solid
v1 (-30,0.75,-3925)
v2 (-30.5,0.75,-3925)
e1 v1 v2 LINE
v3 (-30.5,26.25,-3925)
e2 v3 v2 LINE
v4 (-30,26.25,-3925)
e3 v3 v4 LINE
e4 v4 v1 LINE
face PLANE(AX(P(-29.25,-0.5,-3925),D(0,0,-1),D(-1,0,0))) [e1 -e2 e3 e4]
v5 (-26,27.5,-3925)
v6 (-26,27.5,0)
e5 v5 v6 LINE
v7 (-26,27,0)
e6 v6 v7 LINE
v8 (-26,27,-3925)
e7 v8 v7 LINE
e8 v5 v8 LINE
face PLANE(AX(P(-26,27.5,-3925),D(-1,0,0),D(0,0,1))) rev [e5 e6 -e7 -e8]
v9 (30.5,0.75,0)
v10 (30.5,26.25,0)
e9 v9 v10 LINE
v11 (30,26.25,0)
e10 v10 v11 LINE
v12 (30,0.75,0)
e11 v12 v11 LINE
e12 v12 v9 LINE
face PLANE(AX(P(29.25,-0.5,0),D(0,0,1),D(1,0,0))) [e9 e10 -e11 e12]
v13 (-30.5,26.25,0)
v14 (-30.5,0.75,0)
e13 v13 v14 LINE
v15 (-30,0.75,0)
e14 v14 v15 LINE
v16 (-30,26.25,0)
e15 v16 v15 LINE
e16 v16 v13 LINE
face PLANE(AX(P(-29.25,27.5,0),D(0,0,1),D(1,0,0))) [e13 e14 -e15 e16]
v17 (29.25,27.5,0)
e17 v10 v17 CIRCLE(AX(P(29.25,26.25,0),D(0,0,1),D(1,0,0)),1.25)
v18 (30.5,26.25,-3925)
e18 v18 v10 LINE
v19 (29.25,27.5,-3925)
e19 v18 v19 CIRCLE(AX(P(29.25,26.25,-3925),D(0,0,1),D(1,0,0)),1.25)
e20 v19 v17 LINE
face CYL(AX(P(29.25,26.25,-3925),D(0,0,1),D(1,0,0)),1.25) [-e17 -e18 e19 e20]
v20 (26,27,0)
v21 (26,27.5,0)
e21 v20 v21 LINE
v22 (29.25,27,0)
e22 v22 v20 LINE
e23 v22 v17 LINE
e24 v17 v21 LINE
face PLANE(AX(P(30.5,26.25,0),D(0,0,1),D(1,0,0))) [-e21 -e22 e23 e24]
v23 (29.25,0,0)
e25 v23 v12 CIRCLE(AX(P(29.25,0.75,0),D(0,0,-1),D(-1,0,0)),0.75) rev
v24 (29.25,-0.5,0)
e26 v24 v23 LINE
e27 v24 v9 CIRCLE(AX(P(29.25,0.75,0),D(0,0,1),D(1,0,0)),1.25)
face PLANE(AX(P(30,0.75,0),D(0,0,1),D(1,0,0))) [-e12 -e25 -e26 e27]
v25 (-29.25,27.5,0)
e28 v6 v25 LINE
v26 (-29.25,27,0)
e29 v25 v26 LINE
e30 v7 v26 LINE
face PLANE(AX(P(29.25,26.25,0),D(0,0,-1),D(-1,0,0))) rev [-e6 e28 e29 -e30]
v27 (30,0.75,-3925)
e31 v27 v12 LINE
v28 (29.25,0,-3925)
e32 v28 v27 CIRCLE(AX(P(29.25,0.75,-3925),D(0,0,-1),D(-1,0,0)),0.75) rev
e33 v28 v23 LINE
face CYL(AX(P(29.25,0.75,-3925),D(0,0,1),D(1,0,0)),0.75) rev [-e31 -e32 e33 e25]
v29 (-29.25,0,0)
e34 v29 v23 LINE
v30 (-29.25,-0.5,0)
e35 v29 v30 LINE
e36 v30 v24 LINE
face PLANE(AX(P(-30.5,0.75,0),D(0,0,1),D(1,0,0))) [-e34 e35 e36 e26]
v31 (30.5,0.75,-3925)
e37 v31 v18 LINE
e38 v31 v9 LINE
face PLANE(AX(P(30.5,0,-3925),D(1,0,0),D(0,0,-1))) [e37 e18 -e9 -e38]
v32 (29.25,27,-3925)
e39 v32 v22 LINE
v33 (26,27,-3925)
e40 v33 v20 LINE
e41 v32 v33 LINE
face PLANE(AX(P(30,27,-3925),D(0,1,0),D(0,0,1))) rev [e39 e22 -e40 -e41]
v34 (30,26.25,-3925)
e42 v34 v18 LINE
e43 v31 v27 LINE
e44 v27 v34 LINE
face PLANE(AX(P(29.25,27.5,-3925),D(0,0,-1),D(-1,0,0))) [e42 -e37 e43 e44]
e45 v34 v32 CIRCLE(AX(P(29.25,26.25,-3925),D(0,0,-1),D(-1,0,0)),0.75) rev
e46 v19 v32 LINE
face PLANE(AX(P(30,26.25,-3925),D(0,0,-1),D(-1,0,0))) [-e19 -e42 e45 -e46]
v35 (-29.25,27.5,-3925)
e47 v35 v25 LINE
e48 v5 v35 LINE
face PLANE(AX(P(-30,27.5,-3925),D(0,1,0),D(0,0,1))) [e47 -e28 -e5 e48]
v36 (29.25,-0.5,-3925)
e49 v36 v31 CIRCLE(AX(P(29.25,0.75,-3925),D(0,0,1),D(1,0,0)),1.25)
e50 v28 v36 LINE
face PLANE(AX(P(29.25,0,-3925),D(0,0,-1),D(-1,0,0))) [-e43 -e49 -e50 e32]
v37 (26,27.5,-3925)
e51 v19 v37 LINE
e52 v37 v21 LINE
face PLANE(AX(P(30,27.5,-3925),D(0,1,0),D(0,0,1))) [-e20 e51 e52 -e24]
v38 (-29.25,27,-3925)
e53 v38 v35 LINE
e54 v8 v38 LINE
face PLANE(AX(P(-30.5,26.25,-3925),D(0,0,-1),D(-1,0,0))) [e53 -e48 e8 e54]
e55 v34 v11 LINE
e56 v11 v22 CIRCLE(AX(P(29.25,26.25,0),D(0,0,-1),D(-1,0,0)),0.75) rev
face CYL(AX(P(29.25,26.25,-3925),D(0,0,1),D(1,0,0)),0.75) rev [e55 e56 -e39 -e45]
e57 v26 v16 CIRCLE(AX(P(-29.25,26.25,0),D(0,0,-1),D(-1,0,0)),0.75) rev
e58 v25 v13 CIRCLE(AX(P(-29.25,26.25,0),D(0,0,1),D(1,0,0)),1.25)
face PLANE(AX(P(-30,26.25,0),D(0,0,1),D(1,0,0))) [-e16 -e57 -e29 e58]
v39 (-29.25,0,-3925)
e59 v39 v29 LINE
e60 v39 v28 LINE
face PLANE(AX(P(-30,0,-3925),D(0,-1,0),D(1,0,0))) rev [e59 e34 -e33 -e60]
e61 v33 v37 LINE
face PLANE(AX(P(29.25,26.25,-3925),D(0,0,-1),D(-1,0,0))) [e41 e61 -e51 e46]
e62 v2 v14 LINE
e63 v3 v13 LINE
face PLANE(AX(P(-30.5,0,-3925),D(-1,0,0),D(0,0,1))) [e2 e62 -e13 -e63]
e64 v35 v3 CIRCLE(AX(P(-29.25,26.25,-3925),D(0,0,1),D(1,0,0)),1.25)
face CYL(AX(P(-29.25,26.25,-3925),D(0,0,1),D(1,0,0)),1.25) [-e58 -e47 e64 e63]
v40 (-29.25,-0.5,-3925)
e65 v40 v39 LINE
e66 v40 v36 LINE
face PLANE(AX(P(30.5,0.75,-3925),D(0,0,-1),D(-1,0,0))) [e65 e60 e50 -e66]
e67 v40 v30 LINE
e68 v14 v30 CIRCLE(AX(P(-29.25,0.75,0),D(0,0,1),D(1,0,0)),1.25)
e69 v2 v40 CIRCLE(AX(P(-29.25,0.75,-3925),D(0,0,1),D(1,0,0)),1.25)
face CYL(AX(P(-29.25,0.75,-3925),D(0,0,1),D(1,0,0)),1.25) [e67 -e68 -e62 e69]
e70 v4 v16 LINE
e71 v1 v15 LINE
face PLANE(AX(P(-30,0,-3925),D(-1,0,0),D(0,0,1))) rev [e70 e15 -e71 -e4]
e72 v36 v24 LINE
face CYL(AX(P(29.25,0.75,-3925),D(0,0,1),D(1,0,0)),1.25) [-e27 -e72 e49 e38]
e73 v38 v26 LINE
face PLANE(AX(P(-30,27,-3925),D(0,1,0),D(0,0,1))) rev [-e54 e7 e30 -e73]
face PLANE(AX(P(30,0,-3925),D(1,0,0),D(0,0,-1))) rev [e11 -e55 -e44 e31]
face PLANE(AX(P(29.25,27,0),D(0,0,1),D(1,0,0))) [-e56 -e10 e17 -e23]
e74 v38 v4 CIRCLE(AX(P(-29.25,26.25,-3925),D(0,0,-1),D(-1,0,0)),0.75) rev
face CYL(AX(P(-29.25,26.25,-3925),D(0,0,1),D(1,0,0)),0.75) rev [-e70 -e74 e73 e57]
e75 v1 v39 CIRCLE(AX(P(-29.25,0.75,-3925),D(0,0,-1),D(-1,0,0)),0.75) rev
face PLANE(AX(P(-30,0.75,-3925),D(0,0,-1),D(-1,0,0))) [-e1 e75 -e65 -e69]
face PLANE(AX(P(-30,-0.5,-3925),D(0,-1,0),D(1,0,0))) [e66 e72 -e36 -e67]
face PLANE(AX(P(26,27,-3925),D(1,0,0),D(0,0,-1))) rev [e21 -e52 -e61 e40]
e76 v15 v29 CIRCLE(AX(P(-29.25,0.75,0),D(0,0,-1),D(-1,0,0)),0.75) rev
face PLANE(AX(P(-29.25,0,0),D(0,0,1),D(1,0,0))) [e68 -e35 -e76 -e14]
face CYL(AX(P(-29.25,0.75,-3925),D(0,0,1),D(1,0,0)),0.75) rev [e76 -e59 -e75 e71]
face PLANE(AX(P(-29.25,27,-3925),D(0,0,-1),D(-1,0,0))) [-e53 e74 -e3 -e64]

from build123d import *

# Parameters (mm, degrees)
SM_BASE_FLANGE_1_DEPTH = 3925


# Sheet-metal steps are written as plain solids
with BuildPart() as part:
    # Sketch 1 → Базовая кромка1 (new body)
    with BuildSketch(Plane.XY):
        with BuildLine():
            Line((-26, 27), (-29.25, 27))
            ThreePointArc((-29.25, 27), (-29.780330086, 26.780330086), (-30, 26.25))
            Line((-30, 26.25), (-30, 0.75))
            ThreePointArc((-30, 0.75), (-29.780330086, 0.219669914), (-29.25, 0))
            Line((-29.25, 0), (29.25, 0))
            ThreePointArc((29.25, 0), (29.780330086, 0.219669914), (30, 0.75))
            Line((30, 0.75), (30, 26.25))
            ThreePointArc((30, 26.25), (29.780330086, 26.780330086), (29.25, 27))
            Line((29.25, 27), (26, 27))
            Line((26, 27), (26, 27.5))
            Line((26, 27.5), (29.25, 27.5))
            ThreePointArc((29.25, 27.5), (30.133883476, 27.133883476), (30.5, 26.25))
            Line((30.5, 26.25), (30.5, 0.75))
            ThreePointArc((30.5, 0.75), (30.133883476, -0.133883476), (29.25, -0.5))
            Line((29.25, -0.5), (-29.25, -0.5))
            ThreePointArc((-29.25, -0.5), (-30.133883476, -0.133883476), (-30.5, 0.75))
            Line((-30.5, 0.75), (-30.5, 26.25))
            ThreePointArc((-30.5, 26.25), (-30.133883476, 27.133883476), (-29.25, 27.5))
            Line((-29.25, 27.5), (-26, 27.5))
            Line((-26, 27.5), (-26, 27))
        make_face()
    extrude(amount=-SM_BASE_FLANGE_1_DEPTH)


solid = part.part
